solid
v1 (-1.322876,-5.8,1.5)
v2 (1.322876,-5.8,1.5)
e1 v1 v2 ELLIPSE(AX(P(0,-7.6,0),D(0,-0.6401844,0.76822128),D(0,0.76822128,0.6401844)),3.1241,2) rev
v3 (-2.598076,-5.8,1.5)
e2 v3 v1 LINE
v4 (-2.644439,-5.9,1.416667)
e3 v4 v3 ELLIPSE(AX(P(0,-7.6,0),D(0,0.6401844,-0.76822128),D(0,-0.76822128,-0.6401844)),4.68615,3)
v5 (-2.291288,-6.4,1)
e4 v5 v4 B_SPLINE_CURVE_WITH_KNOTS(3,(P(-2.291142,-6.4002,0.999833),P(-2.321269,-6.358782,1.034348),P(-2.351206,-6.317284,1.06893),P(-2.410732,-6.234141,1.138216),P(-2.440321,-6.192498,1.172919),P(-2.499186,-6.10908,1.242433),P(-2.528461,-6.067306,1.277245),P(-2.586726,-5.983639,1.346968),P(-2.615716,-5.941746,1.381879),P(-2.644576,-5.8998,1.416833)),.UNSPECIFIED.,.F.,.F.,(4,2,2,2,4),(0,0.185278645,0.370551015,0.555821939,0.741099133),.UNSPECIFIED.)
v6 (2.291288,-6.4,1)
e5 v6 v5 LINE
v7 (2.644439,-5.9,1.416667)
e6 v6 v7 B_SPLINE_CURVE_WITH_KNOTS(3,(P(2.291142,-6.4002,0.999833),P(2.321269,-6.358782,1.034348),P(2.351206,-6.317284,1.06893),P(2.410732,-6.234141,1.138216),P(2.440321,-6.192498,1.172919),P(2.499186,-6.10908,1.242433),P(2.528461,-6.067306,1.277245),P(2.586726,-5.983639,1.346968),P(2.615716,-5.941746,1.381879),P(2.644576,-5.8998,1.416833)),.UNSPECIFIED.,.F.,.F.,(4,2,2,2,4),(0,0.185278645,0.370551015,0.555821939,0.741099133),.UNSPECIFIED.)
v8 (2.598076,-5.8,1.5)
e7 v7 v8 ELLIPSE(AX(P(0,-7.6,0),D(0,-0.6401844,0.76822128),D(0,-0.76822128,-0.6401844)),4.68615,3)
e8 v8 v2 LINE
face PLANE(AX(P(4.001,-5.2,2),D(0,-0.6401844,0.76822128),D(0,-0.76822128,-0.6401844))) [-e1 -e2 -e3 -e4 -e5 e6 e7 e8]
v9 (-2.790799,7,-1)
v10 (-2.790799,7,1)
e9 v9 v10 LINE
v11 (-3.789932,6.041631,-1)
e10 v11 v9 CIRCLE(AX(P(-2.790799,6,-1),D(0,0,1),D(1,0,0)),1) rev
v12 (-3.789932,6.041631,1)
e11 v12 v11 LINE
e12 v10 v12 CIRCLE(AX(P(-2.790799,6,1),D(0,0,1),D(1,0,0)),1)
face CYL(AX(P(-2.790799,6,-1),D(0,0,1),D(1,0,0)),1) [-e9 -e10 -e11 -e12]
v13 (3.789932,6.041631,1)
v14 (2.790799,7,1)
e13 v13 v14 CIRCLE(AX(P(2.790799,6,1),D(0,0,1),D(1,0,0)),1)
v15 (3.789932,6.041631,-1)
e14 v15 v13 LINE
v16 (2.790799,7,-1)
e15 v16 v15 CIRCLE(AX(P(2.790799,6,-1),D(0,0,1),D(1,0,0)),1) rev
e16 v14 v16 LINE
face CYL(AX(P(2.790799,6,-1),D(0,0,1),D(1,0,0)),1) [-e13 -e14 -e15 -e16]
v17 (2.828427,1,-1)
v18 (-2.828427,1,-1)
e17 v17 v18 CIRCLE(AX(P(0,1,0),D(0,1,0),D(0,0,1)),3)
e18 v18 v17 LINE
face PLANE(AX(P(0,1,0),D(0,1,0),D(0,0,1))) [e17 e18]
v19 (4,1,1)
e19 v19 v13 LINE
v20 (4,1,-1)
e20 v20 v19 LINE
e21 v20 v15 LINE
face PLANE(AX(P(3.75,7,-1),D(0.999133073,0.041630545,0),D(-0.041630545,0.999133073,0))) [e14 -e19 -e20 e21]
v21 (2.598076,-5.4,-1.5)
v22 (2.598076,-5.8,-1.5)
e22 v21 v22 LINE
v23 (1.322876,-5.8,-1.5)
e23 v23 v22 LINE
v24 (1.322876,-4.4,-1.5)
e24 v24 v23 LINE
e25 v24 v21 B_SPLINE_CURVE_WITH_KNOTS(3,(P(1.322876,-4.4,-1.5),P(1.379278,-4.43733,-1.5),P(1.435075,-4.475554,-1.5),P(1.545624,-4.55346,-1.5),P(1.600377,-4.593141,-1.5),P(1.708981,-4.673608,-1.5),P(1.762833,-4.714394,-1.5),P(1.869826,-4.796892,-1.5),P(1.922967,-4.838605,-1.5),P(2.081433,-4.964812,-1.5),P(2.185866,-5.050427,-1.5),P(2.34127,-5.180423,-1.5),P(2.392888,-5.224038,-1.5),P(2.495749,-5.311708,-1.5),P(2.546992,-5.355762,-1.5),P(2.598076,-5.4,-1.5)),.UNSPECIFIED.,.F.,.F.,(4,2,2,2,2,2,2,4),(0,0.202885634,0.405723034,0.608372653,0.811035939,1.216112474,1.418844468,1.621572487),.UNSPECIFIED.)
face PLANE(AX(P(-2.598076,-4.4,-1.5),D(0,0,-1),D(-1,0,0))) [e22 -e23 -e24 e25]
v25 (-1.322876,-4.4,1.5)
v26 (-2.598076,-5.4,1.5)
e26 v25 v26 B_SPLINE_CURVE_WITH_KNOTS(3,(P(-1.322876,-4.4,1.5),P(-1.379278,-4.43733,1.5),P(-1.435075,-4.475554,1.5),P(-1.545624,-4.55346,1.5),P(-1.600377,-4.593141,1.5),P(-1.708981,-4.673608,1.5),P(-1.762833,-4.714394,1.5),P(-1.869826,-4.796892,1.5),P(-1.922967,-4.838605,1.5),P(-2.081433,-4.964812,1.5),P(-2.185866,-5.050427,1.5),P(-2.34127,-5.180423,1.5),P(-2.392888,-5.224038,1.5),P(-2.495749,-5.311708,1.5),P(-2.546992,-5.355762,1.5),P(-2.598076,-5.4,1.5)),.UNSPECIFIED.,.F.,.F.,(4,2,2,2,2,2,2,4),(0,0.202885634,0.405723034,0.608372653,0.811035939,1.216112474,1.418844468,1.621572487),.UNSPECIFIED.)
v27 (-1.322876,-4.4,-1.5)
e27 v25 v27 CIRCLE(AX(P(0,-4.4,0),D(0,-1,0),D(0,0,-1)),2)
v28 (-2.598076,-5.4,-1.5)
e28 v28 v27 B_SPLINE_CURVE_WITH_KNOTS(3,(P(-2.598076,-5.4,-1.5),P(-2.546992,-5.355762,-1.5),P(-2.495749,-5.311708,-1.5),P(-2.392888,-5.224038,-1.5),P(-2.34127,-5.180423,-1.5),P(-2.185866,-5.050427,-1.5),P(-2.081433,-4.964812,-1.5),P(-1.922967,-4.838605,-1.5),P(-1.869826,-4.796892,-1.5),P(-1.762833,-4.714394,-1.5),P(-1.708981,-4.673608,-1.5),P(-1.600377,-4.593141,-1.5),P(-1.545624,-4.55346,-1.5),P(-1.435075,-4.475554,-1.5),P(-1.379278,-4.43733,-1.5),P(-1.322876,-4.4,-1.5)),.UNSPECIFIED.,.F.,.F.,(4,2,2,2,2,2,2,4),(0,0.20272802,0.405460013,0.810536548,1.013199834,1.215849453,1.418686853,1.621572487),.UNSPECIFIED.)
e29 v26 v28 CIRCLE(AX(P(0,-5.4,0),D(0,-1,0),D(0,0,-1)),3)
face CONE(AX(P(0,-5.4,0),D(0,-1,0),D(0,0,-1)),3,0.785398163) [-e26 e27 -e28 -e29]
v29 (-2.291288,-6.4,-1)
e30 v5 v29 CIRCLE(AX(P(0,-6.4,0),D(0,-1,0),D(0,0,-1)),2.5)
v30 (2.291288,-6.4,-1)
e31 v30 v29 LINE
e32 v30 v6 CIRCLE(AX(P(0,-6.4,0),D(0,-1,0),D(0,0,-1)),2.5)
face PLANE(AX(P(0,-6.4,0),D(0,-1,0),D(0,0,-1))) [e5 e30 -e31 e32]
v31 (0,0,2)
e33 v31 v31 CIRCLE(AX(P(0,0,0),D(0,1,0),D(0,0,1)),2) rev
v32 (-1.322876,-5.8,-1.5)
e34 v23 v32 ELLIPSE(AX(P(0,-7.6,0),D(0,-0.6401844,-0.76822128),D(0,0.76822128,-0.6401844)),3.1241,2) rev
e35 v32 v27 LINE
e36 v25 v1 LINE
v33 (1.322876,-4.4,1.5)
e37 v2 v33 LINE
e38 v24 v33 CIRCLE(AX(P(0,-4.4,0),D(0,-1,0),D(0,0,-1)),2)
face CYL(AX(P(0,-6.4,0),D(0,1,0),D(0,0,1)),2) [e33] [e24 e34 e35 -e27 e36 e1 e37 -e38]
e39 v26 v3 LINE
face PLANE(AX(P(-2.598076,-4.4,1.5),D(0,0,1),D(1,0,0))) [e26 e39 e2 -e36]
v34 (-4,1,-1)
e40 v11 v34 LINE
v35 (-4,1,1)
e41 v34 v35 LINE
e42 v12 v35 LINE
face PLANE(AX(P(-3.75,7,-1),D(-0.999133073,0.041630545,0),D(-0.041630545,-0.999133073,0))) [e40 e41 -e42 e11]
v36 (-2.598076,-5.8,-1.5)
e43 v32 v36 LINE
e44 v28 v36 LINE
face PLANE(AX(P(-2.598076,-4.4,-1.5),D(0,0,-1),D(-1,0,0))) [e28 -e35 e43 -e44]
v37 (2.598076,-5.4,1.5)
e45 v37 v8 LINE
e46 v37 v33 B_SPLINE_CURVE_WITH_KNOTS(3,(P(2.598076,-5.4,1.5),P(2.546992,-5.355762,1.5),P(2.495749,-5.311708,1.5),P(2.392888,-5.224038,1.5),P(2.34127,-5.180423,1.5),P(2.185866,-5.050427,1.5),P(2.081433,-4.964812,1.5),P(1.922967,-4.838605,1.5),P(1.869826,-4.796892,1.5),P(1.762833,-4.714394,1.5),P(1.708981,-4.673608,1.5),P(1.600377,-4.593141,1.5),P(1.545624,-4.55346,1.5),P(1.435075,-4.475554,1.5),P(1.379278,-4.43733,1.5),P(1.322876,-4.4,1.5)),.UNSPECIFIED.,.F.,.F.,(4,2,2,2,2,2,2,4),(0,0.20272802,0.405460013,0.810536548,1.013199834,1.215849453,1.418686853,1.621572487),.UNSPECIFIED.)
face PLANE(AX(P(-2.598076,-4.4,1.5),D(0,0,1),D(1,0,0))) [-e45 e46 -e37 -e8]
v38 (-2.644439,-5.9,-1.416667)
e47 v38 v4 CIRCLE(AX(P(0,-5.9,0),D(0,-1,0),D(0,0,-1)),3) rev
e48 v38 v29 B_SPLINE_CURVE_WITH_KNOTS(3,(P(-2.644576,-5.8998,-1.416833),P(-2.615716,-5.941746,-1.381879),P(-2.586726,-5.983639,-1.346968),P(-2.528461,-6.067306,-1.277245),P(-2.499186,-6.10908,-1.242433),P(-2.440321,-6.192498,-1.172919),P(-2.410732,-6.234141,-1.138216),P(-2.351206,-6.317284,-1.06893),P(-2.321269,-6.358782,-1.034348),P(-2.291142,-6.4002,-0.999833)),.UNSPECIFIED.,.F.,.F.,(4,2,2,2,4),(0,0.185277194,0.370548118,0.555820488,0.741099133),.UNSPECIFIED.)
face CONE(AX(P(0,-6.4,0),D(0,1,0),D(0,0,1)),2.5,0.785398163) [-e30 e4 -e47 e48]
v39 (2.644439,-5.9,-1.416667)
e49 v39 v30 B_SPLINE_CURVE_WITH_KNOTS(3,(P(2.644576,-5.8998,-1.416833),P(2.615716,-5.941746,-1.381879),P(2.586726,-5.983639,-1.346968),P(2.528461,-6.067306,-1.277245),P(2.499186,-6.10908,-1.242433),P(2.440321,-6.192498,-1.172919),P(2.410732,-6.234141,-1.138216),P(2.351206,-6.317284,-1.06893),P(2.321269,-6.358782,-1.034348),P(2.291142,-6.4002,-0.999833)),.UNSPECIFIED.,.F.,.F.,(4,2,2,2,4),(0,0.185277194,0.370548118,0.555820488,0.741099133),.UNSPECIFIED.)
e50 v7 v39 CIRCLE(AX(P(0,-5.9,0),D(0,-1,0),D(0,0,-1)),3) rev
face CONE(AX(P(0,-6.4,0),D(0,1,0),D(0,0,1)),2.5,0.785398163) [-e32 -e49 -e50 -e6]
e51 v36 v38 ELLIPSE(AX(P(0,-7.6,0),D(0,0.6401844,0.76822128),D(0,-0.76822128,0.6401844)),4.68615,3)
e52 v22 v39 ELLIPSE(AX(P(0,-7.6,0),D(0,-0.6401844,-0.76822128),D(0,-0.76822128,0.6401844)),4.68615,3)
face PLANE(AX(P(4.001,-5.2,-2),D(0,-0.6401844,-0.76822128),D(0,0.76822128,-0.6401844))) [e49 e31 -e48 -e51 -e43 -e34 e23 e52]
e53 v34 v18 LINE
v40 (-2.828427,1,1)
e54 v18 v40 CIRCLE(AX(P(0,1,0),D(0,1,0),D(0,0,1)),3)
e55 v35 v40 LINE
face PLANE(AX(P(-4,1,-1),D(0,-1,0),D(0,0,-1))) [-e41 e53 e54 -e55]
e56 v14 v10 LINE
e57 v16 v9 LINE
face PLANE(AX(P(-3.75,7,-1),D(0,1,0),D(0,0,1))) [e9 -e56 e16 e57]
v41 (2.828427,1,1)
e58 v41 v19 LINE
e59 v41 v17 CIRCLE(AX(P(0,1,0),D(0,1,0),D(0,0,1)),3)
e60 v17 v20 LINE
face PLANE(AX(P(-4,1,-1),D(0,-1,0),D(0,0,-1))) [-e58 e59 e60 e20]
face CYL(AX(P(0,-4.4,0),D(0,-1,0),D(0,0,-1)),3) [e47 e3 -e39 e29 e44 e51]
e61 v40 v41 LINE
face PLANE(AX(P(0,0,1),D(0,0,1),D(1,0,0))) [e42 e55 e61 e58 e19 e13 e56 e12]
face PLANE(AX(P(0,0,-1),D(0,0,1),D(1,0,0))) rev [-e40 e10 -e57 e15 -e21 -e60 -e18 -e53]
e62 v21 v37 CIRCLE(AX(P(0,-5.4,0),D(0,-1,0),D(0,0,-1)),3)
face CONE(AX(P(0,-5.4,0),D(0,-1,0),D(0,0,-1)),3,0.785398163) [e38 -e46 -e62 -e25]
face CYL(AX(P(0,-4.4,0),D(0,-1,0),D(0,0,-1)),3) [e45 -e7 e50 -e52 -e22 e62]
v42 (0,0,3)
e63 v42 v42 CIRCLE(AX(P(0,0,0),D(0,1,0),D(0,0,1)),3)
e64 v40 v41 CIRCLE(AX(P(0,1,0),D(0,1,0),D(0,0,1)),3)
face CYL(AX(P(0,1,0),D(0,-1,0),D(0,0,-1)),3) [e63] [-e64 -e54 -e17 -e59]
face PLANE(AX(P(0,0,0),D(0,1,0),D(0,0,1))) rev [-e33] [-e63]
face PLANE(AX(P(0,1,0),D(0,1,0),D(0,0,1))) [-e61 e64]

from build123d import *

# Parameters (mm, degrees)
SKETCH_1_R                      = 3
EXTRUDE_1_DEPTH                 = 1
EXTRUDE_2_DEPTH                 = 1
EXTRUDE_2_DEPTH_BACK            = 1
FILLET_1_R                      = 1
SKETCH_3_R                      = 2
EXTRUDE_3_DEPTH                 = 6.4
EXTRUDE_4_DEPTH                 = 2
CHAMFER_1_SIZE                  = 0.5
CHAMFER_2_SIZE                  = 1
CUT_EXTRUDE_1_REACH             = 10.602
CUT_EXTRUDE_1_DIRECTION_2_REACH = 10.602


with BuildPart() as part:
    # 草图1 → 凸台-拉伸1 (new body)
    with BuildSketch(Plane(origin=(0, 0, 0), x_dir=(1, 0, 0), z_dir=(0, 1, 0))):
        with Locations(Location((0, 0, 0), (0, 0, 270))):
            Circle(SKETCH_1_R)
    extrude(amount=EXTRUDE_1_DEPTH)

    # 草图2 → 凸台-拉伸2 (add, two sides: drawn at the far end of the back side and taken through both)
    with BuildSketch(Plane.XY.offset(-EXTRUDE_2_DEPTH_BACK)):
        Polygon((-3.75, 7), (3.75, 7), (4, 1), (-4, 1), align=None)
    extrude(amount=EXTRUDE_2_DEPTH + EXTRUDE_2_DEPTH_BACK)

    # 圆角1
    fillet_1_edges = [part.edges().sort_by_distance(p)[0] for p in [
        (-3.75, 7, 0),
        (3.75, 7, 0),
    ]]
    fillet(fillet_1_edges, radius=FILLET_1_R)

    # 草图3 → 凸台-拉伸3 (add)
    with BuildSketch(Plane(origin=(0, 0, 0), x_dir=(-1, 0, 0), z_dir=(0, -1, 0))):
        with Locations(Location((0, 0, 0), (0, 0, 270))):
            Circle(SKETCH_3_R)
    extrude(amount=EXTRUDE_3_DEPTH)

    # 草图4 → 凸台-拉伸4 (add)
    with BuildSketch(Plane(origin=(0, -6.4, 0), x_dir=(-1, 0, 0), z_dir=(0, -1, 0))):
        with BuildLine():
            Line((2.598076211, -1.5), (-2.598076211, -1.5))
            ThreePointArc((-2.598076211, -1.5), (-3, 0), (-2.598076211, 1.5))
            Line((-2.598076211, 1.5), (2.598076211, 1.5))
            ThreePointArc((2.598076211, 1.5), (3, 0), (2.598076211, -1.5))
        make_face()
    extrude(amount=-EXTRUDE_4_DEPTH)

    # 倒角1
    chamfer_1_edges = [part.edges().sort_by_distance(p)[0] for p in [
        (3, -6.4, 0),
        (-3, -6.4, 0),
    ]]
    chamfer(chamfer_1_edges, length=CHAMFER_1_SIZE)

    # 倒角2
    chamfer_2_edges = [part.edges().sort_by_distance(p)[0] for p in [
        (3, -4.4, 0),
        (-3, -4.4, 0),
    ]]
    chamfer(chamfer_2_edges, length=CHAMFER_2_SIZE - 0.0001)  # a hair under: the kernel refuses the full size

    # 草图5 → 切除-拉伸1 (cut, up to next)
    with BuildSketch(Plane(origin=(0, 0, 0), x_dir=(0, 0, -1), z_dir=(1, 0, 0)), mode=Mode.PRIVATE) as cut_extrude_1_sk1:
        Polygon((2, -5.2), (1, -6.4), (2, -6.4), align=None)
    cut_extrude_1_tool1 = extrude(cut_extrude_1_sk1.sketch, amount=-CUT_EXTRUDE_1_REACH, mode=Mode.PRIVATE) & part.part
    # 草图5 → 切除-拉伸1 (cut, up to next)
    with BuildSketch(Plane(origin=(0, 0, 0), x_dir=(0, 0, -1), z_dir=(1, 0, 0)), mode=Mode.PRIVATE) as cut_extrude_1_sk2:
        Polygon((-2, -5.2), (-2, -6.4), (-1, -6.4), align=None)
    cut_extrude_1_tool2 = extrude(cut_extrude_1_sk2.sketch, amount=-CUT_EXTRUDE_1_REACH, mode=Mode.PRIVATE) & part.part
    add(cut_extrude_1_tool1.solids().sort_by_distance((0, -6, -1.666667))[0], mode=Mode.SUBTRACT)
    add(cut_extrude_1_tool2.solids().sort_by_distance((0, -6, 1.666667))[0], mode=Mode.SUBTRACT)

    # 草图5 → 切除-拉伸1 direction 2 (cut, up to next)
    with BuildSketch(Plane(origin=(0, 0, 0), x_dir=(0, 0, -1), z_dir=(1, 0, 0)), mode=Mode.PRIVATE) as cut_extrude_1_direction_2_sk1:
        Polygon((2, -5.2), (1, -6.4), (2, -6.4), align=None)
    cut_extrude_1_direction_2_tool1 = extrude(cut_extrude_1_direction_2_sk1.sketch, amount=CUT_EXTRUDE_1_DIRECTION_2_REACH, mode=Mode.PRIVATE) & part.part
    # 草图5 → 切除-拉伸1 direction 2 (cut, up to next)
    with BuildSketch(Plane(origin=(0, 0, 0), x_dir=(0, 0, -1), z_dir=(1, 0, 0)), mode=Mode.PRIVATE) as cut_extrude_1_direction_2_sk2:
        Polygon((-2, -5.2), (-2, -6.4), (-1, -6.4), align=None)
    cut_extrude_1_direction_2_tool2 = extrude(cut_extrude_1_direction_2_sk2.sketch, amount=CUT_EXTRUDE_1_DIRECTION_2_REACH, mode=Mode.PRIVATE) & part.part
    add(cut_extrude_1_direction_2_tool1.solids().sort_by_distance((0, -6, -1.666667))[0], mode=Mode.SUBTRACT)
    add(cut_extrude_1_direction_2_tool2.solids().sort_by_distance((0, -6, 1.666667))[0], mode=Mode.SUBTRACT)


solid = part.part
